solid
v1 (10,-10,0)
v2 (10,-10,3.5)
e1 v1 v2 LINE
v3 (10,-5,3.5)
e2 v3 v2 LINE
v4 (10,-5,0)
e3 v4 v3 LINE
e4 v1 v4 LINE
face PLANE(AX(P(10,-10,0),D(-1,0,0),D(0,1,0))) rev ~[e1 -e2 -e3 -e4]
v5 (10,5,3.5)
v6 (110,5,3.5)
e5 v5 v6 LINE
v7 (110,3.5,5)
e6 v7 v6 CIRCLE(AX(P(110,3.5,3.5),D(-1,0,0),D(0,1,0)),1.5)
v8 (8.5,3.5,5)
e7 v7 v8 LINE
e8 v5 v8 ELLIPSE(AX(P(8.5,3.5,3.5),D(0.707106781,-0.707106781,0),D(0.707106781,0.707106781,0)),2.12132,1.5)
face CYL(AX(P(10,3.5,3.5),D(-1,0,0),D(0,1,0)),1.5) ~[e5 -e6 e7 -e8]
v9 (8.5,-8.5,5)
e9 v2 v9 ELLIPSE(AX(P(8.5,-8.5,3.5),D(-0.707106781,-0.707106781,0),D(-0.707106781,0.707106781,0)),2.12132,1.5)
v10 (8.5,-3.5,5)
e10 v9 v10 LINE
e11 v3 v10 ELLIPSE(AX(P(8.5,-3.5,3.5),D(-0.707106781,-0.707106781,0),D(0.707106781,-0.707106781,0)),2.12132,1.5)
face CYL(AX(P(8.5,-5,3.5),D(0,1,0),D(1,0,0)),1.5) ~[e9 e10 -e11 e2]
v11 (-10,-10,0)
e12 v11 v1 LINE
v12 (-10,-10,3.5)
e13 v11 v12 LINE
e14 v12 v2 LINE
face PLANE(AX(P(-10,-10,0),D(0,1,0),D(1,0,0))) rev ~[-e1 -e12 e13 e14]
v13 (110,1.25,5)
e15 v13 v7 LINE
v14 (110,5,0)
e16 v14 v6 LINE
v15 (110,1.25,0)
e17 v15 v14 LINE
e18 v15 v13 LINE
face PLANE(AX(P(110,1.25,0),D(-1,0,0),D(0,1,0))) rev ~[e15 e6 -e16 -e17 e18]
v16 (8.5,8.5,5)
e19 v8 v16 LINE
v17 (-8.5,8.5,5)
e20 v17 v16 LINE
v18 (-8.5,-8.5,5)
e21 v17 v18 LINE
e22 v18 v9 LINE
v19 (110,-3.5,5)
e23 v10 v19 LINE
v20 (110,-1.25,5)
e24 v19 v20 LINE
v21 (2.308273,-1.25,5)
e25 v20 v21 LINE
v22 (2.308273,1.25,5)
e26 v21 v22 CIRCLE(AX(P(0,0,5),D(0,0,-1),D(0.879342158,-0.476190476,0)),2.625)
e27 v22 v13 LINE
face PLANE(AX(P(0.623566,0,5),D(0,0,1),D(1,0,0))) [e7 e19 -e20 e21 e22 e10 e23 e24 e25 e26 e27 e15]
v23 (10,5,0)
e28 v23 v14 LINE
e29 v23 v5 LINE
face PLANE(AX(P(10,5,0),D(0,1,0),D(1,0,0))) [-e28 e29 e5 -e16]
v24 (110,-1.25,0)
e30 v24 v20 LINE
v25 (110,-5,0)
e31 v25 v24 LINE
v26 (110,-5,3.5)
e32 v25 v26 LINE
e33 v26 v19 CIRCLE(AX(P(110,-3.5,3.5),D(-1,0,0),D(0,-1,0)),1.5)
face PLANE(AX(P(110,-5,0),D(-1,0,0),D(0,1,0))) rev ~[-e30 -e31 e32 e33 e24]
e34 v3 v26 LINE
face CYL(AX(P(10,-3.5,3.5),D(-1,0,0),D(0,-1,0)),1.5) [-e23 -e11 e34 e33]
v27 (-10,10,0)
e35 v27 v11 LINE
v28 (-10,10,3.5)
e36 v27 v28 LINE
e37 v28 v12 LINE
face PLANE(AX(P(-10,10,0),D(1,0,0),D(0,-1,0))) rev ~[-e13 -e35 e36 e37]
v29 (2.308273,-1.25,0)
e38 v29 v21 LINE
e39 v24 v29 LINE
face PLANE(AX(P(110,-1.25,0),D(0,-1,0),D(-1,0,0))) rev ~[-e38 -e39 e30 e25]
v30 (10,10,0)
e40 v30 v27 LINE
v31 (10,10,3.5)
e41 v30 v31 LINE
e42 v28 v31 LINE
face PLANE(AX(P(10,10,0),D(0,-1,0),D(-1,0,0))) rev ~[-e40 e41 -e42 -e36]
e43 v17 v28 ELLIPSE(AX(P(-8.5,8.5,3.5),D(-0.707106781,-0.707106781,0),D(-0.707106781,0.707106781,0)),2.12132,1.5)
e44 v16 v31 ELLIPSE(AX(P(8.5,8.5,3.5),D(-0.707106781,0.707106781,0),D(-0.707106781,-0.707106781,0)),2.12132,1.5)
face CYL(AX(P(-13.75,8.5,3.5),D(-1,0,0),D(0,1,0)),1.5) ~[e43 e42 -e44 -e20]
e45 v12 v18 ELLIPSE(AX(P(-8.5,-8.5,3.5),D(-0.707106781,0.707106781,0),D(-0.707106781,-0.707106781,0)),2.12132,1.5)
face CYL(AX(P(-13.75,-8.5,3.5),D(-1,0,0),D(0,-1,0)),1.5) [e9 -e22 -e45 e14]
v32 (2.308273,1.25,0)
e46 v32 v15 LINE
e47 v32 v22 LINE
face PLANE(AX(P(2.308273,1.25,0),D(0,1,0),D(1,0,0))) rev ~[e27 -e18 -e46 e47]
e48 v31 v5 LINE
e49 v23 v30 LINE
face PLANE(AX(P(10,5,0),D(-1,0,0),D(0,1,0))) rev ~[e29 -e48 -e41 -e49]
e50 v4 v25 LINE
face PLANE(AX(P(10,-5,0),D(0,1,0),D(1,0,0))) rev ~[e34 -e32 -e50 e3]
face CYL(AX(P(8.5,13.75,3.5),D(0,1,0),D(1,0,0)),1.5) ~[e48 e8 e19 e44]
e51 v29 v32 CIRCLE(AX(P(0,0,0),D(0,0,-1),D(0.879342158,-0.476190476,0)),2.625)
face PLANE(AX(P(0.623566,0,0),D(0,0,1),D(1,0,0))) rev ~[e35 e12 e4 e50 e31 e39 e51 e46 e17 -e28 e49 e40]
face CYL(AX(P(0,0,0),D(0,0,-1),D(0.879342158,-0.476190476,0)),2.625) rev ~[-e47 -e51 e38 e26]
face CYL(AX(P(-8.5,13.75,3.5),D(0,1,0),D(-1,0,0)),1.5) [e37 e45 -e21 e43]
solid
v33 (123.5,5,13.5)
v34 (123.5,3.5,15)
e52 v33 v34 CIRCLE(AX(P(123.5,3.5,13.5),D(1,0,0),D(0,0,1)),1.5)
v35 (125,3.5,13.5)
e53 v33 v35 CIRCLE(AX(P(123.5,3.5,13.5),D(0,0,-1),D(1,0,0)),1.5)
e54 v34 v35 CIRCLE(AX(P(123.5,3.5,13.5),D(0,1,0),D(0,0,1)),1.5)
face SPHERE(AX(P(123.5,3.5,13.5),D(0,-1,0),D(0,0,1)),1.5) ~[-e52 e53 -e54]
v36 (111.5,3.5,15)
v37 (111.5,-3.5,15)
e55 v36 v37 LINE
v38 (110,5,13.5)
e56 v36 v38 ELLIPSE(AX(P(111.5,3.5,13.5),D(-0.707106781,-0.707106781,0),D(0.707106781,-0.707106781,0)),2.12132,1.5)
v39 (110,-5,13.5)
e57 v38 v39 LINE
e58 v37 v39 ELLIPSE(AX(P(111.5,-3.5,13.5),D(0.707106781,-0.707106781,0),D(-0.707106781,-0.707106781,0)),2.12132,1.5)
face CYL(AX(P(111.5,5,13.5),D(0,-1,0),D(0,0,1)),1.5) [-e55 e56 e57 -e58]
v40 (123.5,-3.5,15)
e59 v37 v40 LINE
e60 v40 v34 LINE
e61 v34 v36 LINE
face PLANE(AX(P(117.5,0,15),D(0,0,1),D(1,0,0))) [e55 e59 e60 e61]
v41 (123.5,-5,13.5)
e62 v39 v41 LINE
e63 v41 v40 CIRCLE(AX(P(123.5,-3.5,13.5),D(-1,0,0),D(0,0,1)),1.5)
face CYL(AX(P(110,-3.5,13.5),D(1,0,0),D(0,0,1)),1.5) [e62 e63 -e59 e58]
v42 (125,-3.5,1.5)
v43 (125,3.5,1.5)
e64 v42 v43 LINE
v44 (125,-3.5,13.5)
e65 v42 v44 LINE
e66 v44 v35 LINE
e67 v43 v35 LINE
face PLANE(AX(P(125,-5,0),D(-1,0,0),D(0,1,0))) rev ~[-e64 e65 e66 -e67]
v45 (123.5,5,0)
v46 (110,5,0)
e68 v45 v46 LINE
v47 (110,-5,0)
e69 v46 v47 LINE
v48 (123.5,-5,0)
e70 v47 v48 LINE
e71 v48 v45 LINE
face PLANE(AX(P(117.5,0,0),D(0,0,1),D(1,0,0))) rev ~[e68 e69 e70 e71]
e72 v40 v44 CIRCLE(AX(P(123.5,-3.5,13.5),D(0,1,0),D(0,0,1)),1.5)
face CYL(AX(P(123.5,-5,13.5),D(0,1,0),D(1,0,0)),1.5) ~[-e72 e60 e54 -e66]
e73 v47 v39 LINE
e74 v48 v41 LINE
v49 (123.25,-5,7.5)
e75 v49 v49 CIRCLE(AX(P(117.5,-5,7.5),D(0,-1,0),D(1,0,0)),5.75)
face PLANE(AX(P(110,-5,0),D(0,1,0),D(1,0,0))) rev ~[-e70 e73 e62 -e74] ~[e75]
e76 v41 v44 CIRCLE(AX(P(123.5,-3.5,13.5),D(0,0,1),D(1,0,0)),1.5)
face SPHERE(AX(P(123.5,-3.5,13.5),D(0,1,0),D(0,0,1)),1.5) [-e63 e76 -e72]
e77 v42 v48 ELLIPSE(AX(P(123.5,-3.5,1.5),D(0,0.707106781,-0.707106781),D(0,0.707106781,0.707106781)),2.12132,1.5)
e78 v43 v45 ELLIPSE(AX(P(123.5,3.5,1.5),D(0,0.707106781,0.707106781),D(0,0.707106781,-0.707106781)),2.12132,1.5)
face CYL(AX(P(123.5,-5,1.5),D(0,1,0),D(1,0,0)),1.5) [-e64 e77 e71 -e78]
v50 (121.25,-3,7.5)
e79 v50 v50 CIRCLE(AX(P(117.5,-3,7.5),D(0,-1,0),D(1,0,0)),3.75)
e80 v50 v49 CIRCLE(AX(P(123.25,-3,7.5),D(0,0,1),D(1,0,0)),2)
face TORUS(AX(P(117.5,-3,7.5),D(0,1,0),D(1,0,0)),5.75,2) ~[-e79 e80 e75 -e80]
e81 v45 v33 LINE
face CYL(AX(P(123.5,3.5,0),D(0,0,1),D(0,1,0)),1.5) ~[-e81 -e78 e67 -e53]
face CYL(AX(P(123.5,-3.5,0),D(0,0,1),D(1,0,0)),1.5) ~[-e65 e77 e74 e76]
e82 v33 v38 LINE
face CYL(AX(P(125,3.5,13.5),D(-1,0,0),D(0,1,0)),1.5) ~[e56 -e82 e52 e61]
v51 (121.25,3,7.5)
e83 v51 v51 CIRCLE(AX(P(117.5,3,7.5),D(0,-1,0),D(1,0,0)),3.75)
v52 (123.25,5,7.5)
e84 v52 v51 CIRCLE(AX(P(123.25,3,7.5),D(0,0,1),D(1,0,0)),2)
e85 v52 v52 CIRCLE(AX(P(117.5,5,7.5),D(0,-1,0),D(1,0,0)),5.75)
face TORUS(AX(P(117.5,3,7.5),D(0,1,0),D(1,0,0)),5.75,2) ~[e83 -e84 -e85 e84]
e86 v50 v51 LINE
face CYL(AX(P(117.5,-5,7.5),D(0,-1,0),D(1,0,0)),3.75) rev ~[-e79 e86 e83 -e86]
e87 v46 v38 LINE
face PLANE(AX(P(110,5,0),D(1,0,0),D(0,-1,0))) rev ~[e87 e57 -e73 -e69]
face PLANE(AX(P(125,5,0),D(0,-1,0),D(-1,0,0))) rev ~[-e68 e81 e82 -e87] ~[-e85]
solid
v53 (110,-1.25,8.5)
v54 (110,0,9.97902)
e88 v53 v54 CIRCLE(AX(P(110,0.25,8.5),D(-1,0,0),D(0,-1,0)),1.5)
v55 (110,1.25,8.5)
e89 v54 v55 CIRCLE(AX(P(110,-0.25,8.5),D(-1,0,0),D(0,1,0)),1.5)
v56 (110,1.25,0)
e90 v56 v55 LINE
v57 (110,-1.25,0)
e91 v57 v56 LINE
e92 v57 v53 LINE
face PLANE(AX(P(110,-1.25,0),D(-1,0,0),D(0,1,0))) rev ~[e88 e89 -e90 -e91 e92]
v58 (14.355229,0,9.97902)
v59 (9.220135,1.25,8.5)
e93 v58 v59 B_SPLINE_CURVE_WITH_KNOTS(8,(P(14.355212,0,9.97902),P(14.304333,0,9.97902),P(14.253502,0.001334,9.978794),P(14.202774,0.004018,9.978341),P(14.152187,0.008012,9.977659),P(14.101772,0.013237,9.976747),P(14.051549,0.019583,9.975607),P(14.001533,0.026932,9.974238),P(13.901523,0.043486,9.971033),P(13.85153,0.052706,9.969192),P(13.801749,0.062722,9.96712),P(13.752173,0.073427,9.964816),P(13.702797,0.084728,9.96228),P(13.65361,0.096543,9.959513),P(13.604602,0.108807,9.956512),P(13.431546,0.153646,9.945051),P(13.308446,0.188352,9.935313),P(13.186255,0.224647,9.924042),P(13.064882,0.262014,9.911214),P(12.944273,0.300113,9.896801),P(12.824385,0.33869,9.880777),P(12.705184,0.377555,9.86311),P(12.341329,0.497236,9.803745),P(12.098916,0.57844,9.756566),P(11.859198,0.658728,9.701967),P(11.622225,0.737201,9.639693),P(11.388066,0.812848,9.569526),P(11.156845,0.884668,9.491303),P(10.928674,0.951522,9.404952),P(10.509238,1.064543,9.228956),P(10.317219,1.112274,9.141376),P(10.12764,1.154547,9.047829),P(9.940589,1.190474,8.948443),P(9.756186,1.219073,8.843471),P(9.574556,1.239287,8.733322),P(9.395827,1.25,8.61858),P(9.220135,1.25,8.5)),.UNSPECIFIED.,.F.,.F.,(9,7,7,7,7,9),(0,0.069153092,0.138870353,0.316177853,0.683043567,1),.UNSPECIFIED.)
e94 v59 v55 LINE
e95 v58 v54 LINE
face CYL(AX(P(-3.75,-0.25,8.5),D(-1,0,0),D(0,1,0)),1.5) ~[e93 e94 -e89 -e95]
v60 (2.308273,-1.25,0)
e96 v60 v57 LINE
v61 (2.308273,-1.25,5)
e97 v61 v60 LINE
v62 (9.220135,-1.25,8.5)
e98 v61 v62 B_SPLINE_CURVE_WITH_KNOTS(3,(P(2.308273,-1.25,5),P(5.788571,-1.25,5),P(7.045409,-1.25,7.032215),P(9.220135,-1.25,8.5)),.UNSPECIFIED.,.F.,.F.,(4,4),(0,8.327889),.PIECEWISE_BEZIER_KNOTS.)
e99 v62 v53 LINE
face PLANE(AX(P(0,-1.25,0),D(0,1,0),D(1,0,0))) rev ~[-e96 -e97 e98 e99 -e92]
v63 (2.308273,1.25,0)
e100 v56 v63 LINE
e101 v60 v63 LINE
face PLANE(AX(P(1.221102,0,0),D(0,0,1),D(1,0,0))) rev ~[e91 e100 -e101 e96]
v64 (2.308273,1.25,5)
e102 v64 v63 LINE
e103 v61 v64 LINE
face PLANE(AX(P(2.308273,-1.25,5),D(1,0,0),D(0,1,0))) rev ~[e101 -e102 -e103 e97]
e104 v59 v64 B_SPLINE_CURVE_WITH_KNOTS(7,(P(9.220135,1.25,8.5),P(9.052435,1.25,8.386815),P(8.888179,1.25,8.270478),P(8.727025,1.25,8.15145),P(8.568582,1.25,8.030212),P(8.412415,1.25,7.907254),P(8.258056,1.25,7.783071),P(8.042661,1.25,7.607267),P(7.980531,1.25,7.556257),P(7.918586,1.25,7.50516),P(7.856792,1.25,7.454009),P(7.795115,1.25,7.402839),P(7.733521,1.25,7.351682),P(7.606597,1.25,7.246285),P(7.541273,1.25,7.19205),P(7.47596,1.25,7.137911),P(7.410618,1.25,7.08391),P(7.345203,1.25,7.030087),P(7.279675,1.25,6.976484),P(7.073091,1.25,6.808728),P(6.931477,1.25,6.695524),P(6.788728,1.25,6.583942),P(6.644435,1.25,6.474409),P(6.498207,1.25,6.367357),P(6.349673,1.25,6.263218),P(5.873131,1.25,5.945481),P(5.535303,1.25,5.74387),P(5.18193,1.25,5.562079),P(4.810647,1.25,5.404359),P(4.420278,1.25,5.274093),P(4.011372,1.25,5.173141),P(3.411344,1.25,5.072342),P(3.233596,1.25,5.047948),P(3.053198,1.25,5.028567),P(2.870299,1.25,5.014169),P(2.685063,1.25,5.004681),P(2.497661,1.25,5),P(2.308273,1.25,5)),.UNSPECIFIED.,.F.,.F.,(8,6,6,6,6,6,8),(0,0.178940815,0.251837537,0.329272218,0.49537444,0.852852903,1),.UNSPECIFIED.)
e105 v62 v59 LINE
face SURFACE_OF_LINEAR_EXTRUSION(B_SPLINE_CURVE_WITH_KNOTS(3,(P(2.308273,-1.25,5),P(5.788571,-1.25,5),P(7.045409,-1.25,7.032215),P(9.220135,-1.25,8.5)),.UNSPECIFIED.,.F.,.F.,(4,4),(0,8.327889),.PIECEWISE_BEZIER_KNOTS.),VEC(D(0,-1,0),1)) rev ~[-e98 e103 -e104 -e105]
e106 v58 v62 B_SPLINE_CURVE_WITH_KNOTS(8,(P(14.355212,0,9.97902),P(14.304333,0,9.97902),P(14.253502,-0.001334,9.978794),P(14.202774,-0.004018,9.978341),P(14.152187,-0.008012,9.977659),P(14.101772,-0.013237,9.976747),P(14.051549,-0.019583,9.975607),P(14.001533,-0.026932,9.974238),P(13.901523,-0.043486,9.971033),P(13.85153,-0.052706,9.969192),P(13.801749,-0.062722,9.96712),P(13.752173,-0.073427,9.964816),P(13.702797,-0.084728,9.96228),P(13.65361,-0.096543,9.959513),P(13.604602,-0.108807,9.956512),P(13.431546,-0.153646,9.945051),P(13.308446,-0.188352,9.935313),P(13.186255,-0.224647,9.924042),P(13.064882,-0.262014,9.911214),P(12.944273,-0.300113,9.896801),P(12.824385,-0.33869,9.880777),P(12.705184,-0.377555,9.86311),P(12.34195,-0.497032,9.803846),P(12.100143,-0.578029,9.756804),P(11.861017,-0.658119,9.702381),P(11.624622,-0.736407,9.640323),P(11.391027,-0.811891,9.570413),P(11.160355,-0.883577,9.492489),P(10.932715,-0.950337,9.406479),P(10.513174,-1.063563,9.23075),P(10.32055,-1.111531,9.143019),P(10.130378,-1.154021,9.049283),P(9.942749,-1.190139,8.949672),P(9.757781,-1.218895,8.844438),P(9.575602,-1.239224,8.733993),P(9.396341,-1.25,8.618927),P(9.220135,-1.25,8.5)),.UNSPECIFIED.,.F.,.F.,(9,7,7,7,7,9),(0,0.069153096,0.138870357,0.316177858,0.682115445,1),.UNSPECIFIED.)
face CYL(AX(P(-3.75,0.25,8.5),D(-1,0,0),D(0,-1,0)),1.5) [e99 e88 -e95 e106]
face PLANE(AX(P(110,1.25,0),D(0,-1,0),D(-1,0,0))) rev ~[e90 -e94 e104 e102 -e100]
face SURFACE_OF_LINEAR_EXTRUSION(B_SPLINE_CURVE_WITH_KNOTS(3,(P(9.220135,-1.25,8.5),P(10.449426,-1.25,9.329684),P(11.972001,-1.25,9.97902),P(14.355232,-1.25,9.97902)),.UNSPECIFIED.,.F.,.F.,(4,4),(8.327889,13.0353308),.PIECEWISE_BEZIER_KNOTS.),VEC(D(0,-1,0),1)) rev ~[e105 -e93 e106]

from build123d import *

# Parameters (mm, degrees)
F0_W          = 100
F0_H          = 3.75
F1_DEPTH      = 5
F0_H_2        = 2.5
F2_DEPTH      = 10
F3_DEPTH      = 15
F4_R          = 3.75
F5_DEPTH      = 30.025
F6_R          = 1.5
F7_T1_DEPTH   = 103.75
F7_T3_DEPTH   = 27.5
F7_T5_DEPTH   = 8.75
F7_T7_DEPTH   = 8.75
F7_T9_DEPTH   = 27.5
F7_T15_DEPTH  = 12.5
F7_T19_DEPTH  = 107.5
F7_T26_DEPTH  = 107.5
F7_T30_DEPTH  = 12.5
F7_2_T1_DEPTH = 117.5
F9_DEPTH      = 25
F9_FACE_W     = 2.3082731641
F9_FACE_H     = 2.5
F10_DEPTH     = 25
F11_R         = 2


# Not quite as in the source:
# - a fillet or chamfer that OpenCascade refuses, or shapes differently, is made with other operations: its cross-section is extruded or revolved along the edge and cut away or added
# - a feature names something its author has since deleted; it is built from what else it names


with BuildPart() as f1:
    # F0 (on Top) → F1 (new body)
    with BuildSketch(Plane.XY):
        with BuildLine():
            Line((10, 10), (-10, 10))
            Line((-10, 10), (-10, -10))
            Line((-10, -10), (10, -10))
            Line((10, -10), (10, -5))
            Line((10, -5), (10, -1.25))
            Line((10, -1.25), (2.3082731641, -1.25))
            ThreePointArc((2.3082731641, -1.25), (-2.625, 0), (2.3082731641, 1.25))
            Line((2.3082731641, 1.25), (10, 1.25))
            Line((10, 1.25), (10, 5))
            Line((10, 5), (10, 10))
        make_face()
        with Locations((60, 3.125)):
            Rectangle(F0_W, F0_H)
        with Locations((60, -3.125)):
            Rectangle(F0_W, F0_H)
    extrude(amount=F1_DEPTH)

    # F7: fillet of radius 1.5 on 7 edges, made by hand

    # F7_s2 → F7_t1 (cut)
    with BuildSketch(Plane.YZ.offset(10)):
        with BuildLine():
            ThreePointArc((-5, 3.5), (-4.5606601718, 4.5606601718), (-3.5, 5))
            Line((-3.5, 5), (-5, 5))
            Line((-5, 5), (-5, 3.5))
        make_face()
        with BuildLine():
            ThreePointArc((5, 3.5), (4.5606601718, 4.5606601718), (3.5, 5))
            Line((3.5, 5), (5, 5))
            Line((5, 5), (5, 3.5))
        make_face()
    extrude(amount=F7_T1_DEPTH, mode=Mode.SUBTRACT)

    # F7_s4 → F7_t3 (cut)
    with BuildSketch(Plane.YZ.offset(-13.75)):
        with BuildLine():
            ThreePointArc((10, 3.5), (9.5606601718, 4.5606601718), (8.5, 5))
            Line((8.5, 5), (10, 5))
            Line((10, 5), (10, 3.5))
        make_face()
        with BuildLine():
            ThreePointArc((-10, 3.5), (-9.5606601718, 4.5606601718), (-8.5, 5))
            Line((-8.5, 5), (-10, 5))
            Line((-10, 5), (-10, 3.5))
        make_face()
    extrude(amount=F7_T3_DEPTH, mode=Mode.SUBTRACT)

    # F7_s6 → F7_t5 (cut)
    with BuildSketch(Plane.XZ.offset(-13.75)):
        with BuildLine():
            ThreePointArc((10, 3.5), (9.5606601718, 4.5606601718), (8.5, 5))
            Line((8.5, 5), (10, 5))
            Line((10, 5), (10, 3.5))
        make_face()
    extrude(amount=F7_T5_DEPTH, mode=Mode.SUBTRACT)

    # F7_s8 → F7_t7 (cut)
    with BuildSketch(Plane.XZ.offset(5)):
        with BuildLine():
            ThreePointArc((10, 3.5), (9.5606601718, 4.5606601718), (8.5, 5))
            Line((8.5, 5), (10, 5))
            Line((10, 5), (10, 3.5))
        make_face()
    extrude(amount=F7_T7_DEPTH, mode=Mode.SUBTRACT)

    # F7_s10 → F7_t9 (cut)
    with BuildSketch(Plane.XZ.offset(-13.75)):
        with BuildLine():
            ThreePointArc((-10, 3.5), (-9.5606601718, 4.5606601718), (-8.5, 5))
            Line((-8.5, 5), (-10, 5))
            Line((-10, 5), (-10, 3.5))
        make_face()
    extrude(amount=F7_T9_DEPTH, mode=Mode.SUBTRACT)


with BuildPart() as f2:
    # F0 (on Top) → F2 (new body)
    with BuildSketch(Plane.XY):
        with BuildLine():
            ThreePointArc((2.625, 0), (2.5445866124, 0.6447510932), (2.3082731641, 1.25))
            Line((2.3082731641, 1.25), (0, 1.25))
            Line((0, 1.25), (0, -1.25))
            Line((0, -1.25), (2.3082731641, -1.25))
            ThreePointArc((2.3082731641, -1.25), (2.5445866124, -0.6447510932), (2.625, 0))
        make_face()
        with BuildLine():
            Line((10, -1.25), (10, 1.25))
            Line((10, 1.25), (2.3082731641, 1.25))
            ThreePointArc((2.3082731641, 1.25), (2.5445866124, 0.6447510932), (2.625, 0))
            ThreePointArc((2.625, 0), (2.5445866124, -0.6447510932), (2.3082731641, -1.25))
            Line((2.3082731641, -1.25), (10, -1.25))
        make_face()
        with Locations((60, 0)):
            Rectangle(F0_W, F0_H_2)
    extrude(amount=F2_DEPTH)

    # F7#2: fillet of radius 1.5 on 2 edges, made by hand

    # F7_2_s2 → F7_2_t1 (cut)
    with BuildSketch(Plane.YZ.offset(-3.75)):
        with BuildLine():
            ThreePointArc((-1.25, 8.5), (-0.8106601718, 9.5606601718), (0.25, 10))
            Line((0.25, 10), (-1.25, 10))
            Line((-1.25, 10), (-1.25, 8.5))
        make_face()
        with BuildLine():
            ThreePointArc((1.25, 8.5), (0.8106601718, 9.5606601718), (-0.25, 10))
            Line((-0.25, 10), (1.25, 10))
            Line((1.25, 10), (1.25, 8.5))
        make_face()
    extrude(amount=F7_2_T1_DEPTH, mode=Mode.SUBTRACT)

    # F8 (on face) → F9 (cut)
    with BuildSketch(Plane.XZ.offset(1.25)):
        with BuildLine():
            Line((0, 5), (2.3082731641, 5))
            add(Edge.make_bspline(
                [(2.3082731641, 5), (5.7885707555, 5), (7.0454086994, 7.0322147924), (9.2201348345, 8.5)],
                knots=[0, 0, 0, 0, 8.3278889996, 8.3278889996, 8.3278889996, 8.3278889996], degree=3))
            Line((9.2201348345, 8.5), (0, 8.5))
            Line((0, 8.5), (0, 5))
        make_face()
        with BuildLine():
            Line((0, 8.5), (9.2201348345, 8.5))
            add(Edge.make_bspline(
                [(9.2201348345, 8.5), (10.4494255604, 9.3296836618), (11.9720012822, 9.9790199458), (14.3552316788, 9.9790199458)],
                knots=[8.3278889996, 8.3278889996, 8.3278889996, 8.3278889996, 13.0353308004, 13.0353308004, 13.0353308004, 13.0353308004], degree=3))
            Line((14.3552316788, 9.9790199458), (0, 9.9790199458))
            Line((0, 9.9790199458), (0, 8.5))
        make_face()
    extrude(amount=-F9_DEPTH, mode=Mode.SUBTRACT)

    # F0 (on Top) + F9_face (on face) → F10 (cut)
    with BuildSketch(Plane.XY):
        with BuildLine():
            Line((0, 1.25), (2.3082731641, 1.25))
            ThreePointArc((2.3082731641, 1.25), (-2.625, 0), (2.3082731641, -1.25))
            Line((2.3082731641, -1.25), (0, -1.25))
            Line((0, -1.25), (0, 1.25))
        make_face()
    with BuildSketch(Plane(origin=(1.154136582, 0, 5), x_dir=(1, 0, 0), z_dir=(0, 0, 1))):
        Rectangle(F9_FACE_W, F9_FACE_H)
    extrude(amount=-F10_DEPTH, mode=Mode.SUBTRACT)


with BuildPart() as f3:
    # F0 (on Top) → F3 (new body)
    with BuildSketch(Plane.XY):
        Polygon((125, 5), (110, 5), (110, 1.25), (110, -1.25), (110, -5), (125, -5), align=None)
    extrude(amount=F3_DEPTH)

    # F4 (on face) → F5 (cut)
    with BuildSketch(Plane.XZ.offset(5)):
        with Locations((117.5, 7.5)):
            Circle(F4_R)
    extrude(amount=-F5_DEPTH, mode=Mode.SUBTRACT)

    # F6
    f6_edges = [f3.edges().sort_by_distance(p)[0] for p in [
        (110, 0, 15),
        (125, 0, 15),
        (125, 0, 0),
        (117.5, -5, 15),
        (125, -5, 7.5),
        (117.5, 5, 15),
        (125, 5, 7.5),
    ]]
    fillet(f6_edges, radius=F6_R)

    # F11
    f11_edges = [f3.edges().sort_by_distance(p)[0] for p in [
        (113.75, -5, 7.5),
        (113.75, 5, 7.5),
    ]]
    fillet(f11_edges, radius=F11_R)


with BuildPart() as f7_tool13:
    # F7_s14 → F7_t15 (new body)
    with BuildSketch(Plane.XZ.offset(13.75)):
        with BuildLine():
            ThreePointArc((10, 3.5), (9.5606601718, 4.5606601718), (8.5, 5))
            Line((8.5, 5), (10, 5))
            Line((10, 5), (10, 3.5))
        make_face()
    extrude(amount=-F7_T15_DEPTH)

    split(bisect_by=Plane.XZ.offset(5), keep=Keep.BOTTOM)


with BuildPart() as f7_tool17:
    # F7_s18 → F7_t19 (new body)
    with BuildSketch(Plane.YZ.offset(6.25)):
        with BuildLine():
            ThreePointArc((-5, 3.5), (-4.5606601718, 4.5606601718), (-3.5, 5))
            Line((-3.5, 5), (-5, 5))
            Line((-5, 5), (-5, 3.5))
        make_face()
    extrude(amount=F7_T19_DEPTH)

    split(bisect_by=Plane.YZ.offset(10), keep=Keep.BOTTOM)


with BuildPart() as f7_tool13_1:
    add(f7_tool13.part)

    # F7_t21: intersect F7_tool17
    add(f7_tool17.part, mode=Mode.INTERSECT)


with BuildPart() as f1_1:
    add(f1.part)

    # F7_t11: cut F7_tool13
    add(f7_tool13_1.part, mode=Mode.SUBTRACT)


with BuildPart() as f7_tool24:
    # F7_s25 → F7_t26 (new body)
    with BuildSketch(Plane.YZ.offset(113.75)):
        with BuildLine():
            ThreePointArc((5, 3.5), (4.5606601718, 4.5606601718), (3.5, 5))
            Line((3.5, 5), (5, 5))
            Line((5, 5), (5, 3.5))
        make_face()
    extrude(amount=-F7_T26_DEPTH)

    split(bisect_by=Plane.YZ.offset(10), keep=Keep.BOTTOM)


with BuildPart() as f7_tool28:
    # F7_s29 → F7_t30 (new body)
    with BuildSketch(Plane.XZ.offset(-1.25)):
        with BuildLine():
            ThreePointArc((10, 3.5), (9.5606601718, 4.5606601718), (8.5, 5))
            Line((8.5, 5), (10, 5))
            Line((10, 5), (10, 3.5))
        make_face()
    extrude(amount=-F7_T30_DEPTH)

    split(bisect_by=Plane.XZ.offset(-5), keep=Keep.TOP)


with BuildPart() as f7_tool24_1:
    add(f7_tool24.part)

    # F7_t32: intersect F7_tool28
    add(f7_tool28.part, mode=Mode.INTERSECT)


with BuildPart() as f1_2:
    add(f1_1.part)

    # F7_t22: cut F7_tool24
    add(f7_tool24_1.part, mode=Mode.SUBTRACT)


solid = Compound([f2.part, f3.part, f1_2.part])
